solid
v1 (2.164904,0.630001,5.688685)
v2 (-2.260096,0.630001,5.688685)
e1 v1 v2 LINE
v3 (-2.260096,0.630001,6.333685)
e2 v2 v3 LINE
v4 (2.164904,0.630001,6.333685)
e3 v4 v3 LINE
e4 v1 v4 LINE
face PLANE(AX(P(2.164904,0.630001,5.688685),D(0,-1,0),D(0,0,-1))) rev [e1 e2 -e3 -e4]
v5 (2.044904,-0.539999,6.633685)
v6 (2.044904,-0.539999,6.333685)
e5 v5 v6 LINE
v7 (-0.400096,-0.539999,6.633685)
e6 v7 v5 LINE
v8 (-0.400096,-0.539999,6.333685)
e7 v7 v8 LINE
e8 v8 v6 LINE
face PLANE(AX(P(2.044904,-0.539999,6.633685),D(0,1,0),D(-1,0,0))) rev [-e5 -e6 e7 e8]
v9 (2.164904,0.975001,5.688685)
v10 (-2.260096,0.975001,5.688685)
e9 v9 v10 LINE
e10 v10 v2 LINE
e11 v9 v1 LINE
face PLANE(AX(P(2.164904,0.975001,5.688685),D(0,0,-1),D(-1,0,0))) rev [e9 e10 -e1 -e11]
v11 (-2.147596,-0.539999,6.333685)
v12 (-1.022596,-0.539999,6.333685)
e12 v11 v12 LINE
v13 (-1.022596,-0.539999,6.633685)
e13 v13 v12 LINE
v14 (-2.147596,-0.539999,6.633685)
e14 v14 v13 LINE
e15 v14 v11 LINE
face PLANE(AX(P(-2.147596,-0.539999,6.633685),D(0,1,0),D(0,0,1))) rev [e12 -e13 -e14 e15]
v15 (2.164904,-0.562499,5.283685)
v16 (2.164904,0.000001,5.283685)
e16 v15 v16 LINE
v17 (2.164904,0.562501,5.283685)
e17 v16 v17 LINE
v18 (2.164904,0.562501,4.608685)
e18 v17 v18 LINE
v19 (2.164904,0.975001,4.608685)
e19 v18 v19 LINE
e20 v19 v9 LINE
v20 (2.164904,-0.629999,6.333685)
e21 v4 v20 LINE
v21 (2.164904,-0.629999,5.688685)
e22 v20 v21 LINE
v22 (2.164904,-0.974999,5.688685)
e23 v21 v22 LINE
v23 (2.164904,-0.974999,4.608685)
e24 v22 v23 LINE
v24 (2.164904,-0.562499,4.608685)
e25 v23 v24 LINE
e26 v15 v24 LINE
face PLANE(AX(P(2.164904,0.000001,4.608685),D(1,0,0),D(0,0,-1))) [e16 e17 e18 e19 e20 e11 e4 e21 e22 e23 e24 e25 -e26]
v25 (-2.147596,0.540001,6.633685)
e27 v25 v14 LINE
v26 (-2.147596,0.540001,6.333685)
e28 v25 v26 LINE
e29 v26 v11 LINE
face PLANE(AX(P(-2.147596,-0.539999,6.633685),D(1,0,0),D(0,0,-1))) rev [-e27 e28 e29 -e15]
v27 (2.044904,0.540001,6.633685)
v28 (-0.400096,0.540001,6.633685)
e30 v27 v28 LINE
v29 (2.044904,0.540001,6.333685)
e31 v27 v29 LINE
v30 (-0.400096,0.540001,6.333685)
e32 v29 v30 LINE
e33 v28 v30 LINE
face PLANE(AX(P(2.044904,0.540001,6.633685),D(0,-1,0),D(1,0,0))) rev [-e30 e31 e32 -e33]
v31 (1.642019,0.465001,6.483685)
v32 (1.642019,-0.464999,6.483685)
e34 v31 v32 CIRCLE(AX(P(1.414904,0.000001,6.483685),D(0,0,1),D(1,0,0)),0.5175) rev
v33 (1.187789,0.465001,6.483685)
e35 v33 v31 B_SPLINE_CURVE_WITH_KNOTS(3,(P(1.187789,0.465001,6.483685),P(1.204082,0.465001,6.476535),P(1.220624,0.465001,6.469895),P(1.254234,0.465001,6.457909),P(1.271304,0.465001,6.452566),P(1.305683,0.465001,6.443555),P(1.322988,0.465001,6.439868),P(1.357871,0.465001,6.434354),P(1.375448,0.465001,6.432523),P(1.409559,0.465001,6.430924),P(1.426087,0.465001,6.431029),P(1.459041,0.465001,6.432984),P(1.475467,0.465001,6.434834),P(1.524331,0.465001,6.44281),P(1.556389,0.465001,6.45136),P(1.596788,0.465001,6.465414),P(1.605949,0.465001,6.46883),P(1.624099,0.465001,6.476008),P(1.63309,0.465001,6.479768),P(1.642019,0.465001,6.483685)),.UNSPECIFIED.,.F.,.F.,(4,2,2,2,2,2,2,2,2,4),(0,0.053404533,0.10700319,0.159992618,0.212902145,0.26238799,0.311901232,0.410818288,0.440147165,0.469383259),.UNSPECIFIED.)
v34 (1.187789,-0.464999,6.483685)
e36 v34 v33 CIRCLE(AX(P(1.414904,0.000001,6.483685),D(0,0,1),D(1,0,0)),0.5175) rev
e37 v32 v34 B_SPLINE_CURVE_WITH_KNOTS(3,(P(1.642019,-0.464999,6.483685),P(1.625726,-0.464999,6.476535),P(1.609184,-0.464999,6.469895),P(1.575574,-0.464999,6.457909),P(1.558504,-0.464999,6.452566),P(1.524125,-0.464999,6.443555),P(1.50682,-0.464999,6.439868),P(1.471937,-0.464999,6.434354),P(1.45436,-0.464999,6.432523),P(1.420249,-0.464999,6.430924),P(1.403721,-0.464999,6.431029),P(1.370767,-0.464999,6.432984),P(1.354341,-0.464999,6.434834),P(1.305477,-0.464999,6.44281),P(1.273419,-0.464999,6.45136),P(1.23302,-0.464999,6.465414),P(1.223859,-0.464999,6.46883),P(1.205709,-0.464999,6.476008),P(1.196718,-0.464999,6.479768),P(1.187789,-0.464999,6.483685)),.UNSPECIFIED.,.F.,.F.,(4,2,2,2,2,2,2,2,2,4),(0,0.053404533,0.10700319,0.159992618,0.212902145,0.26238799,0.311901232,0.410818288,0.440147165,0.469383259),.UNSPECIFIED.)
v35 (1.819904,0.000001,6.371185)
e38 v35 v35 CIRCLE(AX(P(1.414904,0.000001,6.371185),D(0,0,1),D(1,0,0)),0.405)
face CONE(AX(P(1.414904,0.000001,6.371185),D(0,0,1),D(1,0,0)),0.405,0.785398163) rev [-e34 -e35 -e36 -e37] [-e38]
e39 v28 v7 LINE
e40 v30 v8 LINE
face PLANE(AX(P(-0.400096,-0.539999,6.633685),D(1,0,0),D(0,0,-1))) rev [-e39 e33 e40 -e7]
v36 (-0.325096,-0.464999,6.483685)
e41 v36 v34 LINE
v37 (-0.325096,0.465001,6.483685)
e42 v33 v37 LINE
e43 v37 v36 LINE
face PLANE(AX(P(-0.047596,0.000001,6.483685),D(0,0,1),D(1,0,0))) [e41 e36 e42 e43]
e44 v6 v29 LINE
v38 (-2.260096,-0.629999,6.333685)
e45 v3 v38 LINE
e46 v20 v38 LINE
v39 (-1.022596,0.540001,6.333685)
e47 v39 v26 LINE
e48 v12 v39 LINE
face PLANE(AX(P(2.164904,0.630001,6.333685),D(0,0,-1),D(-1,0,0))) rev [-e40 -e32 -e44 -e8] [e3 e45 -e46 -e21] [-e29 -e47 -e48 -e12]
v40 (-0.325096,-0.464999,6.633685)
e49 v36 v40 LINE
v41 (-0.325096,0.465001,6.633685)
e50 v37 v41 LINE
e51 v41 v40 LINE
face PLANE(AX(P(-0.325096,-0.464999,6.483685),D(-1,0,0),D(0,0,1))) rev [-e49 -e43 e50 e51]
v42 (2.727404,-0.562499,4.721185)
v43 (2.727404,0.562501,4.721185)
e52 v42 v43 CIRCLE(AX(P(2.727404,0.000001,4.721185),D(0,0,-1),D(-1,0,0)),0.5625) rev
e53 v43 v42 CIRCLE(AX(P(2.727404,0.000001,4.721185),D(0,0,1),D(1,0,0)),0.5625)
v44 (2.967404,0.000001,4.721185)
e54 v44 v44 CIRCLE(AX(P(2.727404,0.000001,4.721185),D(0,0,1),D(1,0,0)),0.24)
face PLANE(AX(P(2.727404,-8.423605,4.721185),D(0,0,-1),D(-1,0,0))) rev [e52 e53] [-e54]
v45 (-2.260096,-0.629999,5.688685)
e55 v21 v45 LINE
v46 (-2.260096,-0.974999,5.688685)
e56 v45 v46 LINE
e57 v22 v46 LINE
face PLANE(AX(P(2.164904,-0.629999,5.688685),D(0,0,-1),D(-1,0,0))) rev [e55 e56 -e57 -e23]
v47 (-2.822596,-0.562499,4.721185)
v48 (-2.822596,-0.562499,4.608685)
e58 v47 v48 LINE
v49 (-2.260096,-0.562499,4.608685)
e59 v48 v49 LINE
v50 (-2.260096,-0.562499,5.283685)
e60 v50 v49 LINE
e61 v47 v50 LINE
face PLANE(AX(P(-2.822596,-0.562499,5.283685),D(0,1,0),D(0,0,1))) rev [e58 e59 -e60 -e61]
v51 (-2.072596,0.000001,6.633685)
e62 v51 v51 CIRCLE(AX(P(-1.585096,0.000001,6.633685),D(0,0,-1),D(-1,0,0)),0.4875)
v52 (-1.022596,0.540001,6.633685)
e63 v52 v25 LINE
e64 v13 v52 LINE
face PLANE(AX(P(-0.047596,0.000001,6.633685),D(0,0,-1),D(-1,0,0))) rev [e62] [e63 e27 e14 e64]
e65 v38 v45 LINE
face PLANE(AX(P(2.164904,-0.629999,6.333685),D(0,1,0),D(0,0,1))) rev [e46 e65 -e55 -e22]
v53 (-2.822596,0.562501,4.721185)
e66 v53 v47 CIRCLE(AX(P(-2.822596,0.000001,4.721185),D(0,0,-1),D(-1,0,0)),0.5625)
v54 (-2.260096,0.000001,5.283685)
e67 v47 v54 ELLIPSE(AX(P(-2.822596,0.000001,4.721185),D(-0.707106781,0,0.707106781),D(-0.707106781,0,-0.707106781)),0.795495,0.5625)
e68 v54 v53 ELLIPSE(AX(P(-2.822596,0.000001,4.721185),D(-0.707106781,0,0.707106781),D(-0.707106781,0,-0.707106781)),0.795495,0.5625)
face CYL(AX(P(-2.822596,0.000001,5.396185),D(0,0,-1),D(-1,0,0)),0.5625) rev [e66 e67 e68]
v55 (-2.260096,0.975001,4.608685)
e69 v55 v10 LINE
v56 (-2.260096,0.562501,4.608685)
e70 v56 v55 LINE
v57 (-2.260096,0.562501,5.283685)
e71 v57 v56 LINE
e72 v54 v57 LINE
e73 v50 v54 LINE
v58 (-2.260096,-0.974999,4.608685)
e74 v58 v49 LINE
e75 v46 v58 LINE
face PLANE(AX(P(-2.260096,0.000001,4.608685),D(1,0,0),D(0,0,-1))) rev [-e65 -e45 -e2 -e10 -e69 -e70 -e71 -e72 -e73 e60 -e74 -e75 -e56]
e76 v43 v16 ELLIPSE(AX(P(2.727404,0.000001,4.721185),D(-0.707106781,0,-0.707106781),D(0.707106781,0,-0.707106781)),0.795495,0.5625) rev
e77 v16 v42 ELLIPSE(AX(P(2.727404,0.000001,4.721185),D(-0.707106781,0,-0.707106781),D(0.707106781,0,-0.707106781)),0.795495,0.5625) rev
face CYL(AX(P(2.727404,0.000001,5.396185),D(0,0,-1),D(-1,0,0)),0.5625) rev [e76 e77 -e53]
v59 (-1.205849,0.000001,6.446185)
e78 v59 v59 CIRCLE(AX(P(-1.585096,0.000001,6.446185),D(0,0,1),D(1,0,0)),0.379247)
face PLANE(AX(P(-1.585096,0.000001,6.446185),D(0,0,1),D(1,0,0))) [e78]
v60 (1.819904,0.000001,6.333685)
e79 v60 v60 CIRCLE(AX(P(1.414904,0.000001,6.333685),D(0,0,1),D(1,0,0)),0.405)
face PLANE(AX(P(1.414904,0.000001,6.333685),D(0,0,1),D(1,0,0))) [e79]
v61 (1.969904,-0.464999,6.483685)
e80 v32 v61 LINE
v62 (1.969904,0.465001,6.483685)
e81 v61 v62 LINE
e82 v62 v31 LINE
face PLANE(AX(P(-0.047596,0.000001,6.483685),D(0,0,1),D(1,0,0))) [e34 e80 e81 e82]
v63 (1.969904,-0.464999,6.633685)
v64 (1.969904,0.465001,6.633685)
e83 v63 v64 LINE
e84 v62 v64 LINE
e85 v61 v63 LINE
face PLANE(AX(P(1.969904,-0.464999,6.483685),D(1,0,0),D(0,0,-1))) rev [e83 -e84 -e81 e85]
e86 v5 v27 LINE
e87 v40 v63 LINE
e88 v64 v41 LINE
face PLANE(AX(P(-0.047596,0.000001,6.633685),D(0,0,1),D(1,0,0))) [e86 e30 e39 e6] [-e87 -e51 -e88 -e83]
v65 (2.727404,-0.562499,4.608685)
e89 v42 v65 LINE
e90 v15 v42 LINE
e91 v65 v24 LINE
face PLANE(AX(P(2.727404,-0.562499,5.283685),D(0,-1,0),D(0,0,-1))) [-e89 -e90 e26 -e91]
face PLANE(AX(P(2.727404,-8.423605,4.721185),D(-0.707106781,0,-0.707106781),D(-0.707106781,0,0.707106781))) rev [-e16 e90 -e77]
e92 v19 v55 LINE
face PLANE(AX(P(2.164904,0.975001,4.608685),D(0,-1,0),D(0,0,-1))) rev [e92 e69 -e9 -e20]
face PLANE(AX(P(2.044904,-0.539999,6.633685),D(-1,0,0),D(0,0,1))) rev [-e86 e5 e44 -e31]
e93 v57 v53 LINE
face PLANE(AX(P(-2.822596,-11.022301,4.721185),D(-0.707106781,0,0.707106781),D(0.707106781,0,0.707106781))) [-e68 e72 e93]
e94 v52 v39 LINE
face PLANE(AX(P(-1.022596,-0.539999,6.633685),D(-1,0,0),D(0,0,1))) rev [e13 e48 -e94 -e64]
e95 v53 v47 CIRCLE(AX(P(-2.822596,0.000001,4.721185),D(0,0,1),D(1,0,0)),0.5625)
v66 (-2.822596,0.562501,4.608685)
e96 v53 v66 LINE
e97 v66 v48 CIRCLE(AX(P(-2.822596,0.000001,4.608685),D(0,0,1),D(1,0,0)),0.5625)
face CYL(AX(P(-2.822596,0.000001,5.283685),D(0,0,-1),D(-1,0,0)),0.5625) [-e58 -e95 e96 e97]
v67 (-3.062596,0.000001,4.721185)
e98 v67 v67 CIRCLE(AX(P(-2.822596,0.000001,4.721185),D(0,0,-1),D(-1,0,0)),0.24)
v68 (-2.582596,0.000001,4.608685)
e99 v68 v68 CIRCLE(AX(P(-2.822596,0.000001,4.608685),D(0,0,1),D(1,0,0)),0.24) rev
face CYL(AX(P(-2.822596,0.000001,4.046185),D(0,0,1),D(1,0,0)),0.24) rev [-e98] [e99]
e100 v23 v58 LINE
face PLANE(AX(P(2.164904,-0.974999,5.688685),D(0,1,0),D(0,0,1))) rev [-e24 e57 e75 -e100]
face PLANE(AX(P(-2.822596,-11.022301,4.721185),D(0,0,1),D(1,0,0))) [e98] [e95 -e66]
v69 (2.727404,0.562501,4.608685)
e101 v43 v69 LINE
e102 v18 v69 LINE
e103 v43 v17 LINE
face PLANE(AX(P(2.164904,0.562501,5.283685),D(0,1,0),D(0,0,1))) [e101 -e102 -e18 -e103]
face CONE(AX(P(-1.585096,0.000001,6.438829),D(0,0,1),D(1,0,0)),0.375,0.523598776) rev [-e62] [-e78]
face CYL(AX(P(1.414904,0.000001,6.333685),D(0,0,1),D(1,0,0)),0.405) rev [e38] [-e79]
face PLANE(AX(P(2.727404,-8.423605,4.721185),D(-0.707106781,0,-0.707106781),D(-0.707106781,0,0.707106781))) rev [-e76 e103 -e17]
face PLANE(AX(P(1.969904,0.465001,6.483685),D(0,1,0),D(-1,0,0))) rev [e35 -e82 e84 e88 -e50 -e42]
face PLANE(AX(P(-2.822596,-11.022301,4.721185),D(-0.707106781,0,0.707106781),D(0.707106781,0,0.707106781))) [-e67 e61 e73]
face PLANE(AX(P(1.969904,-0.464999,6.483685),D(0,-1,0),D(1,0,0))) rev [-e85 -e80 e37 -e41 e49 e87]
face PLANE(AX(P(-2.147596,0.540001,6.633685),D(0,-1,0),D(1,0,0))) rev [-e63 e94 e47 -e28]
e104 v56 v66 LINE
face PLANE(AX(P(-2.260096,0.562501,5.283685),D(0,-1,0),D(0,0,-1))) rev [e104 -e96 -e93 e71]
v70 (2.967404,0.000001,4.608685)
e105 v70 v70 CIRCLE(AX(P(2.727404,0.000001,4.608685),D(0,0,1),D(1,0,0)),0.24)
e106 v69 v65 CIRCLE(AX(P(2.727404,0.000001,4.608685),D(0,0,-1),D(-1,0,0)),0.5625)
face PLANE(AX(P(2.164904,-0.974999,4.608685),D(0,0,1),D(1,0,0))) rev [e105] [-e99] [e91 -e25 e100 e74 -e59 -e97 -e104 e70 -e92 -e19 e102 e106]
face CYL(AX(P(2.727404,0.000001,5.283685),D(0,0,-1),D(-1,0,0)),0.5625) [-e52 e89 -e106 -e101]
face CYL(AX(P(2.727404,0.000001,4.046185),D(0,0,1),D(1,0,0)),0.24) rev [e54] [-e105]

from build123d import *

# Parameters (mm, degrees)
BOSS_EXTRUDE5_DEPTH = 14.75
SKETCH9_W           = 7.5
SKETCH9_H           = 7.2
SKETCH9_W_2         = 16.3
BOSS_EXTRUDE6_DEPTH = 2
SKETCH10_W          = 15.3
SKETCH10_H          = 6.2
CUT_EXTRUDE4_DEPTH  = 1
SKETCH11_R          = 2.5
CUT_EXTRUDE5_DEPTH  = 1.25
BOSS_EXTRUDE7_DEPTH = 4.5
CUT_EXTRUDE7_START  = -7.5
CUT_EXTRUDE7_DEPTH  = 7.5
SKETCH18_R          = 3.75
CUT_EXTRUDE8_DEPTH  = 4.5
SKETCH19_R          = 1.6
CUT_EXTRUDE9_DEPTH  = 4.5
CHAMFER1_SIZE       = 0.75
CHAMFER1_SIZE_2     = 1.299038106
SKETCH13_R          = 2.7
CUT_EXTRUDE6_DEPTH  = 1
CHAMFER2_SIZE       = 0.75
SCALE1_SCALE        = 0.15


# Read off the part's stored shape, not the designer's step: Cut-Extrude7
with BuildPart() as part:
    # Sketch8 → Boss-Extrude5 (new, symmetric)
    with BuildSketch(Plane(origin=(0, 0, 0), x_dir=(0, 0, -1), z_dir=(1, 0, 0))):
        Polygon((0, -6.5), (0, 6.5), (-7.2, 6.5), (-7.2, 4.2), (-11.5, 4.2), (-11.5, -4.2), (-7.2, -4.2), (-7.2, -6.5), align=None)
    extrude(amount=BOSS_EXTRUDE5_DEPTH, both=True)

    # Sketch9 → Boss-Extrude6 (add)
    with BuildSketch(Plane.XY.offset(11.5)):
        with Locations((-10.25, 0)):
            Rectangle(SKETCH9_W, SKETCH9_H)
        with Locations((5.8, 0)):
            Rectangle(SKETCH9_W_2, SKETCH9_H)
    extrude(amount=BOSS_EXTRUDE6_DEPTH)

    # Sketch10 → Cut-Extrude4 (cut)
    with BuildSketch(Plane.XY.offset(13.5)):
        with Locations((5.8, 0)):
            Rectangle(SKETCH10_W, SKETCH10_H)
    extrude(amount=-CUT_EXTRUDE4_DEPTH, mode=Mode.SUBTRACT)

    # Sketch11 → Cut-Extrude5 (cut)
    with BuildSketch(Plane.XY.offset(13.5)):
        with Locations((-10.25, 0)):
            Circle(SKETCH11_R)
    extrude(amount=-CUT_EXTRUDE5_DEPTH, mode=Mode.SUBTRACT)

    # Sketch16 → Boss-Extrude7 (add)
    with BuildSketch(Plane(origin=(0, 0, 0), x_dir=(-1, 0, 0), z_dir=(0, 0, -1))):
        with BuildLine():
            Line((-14.75, -3.75), (-14.75, 3.75))
            Line((-14.75, 3.75), (-18.5, 3.75))
            ThreePointArc((-18.5, 3.75), (-22.25, 0), (-18.5, -3.75))
            Line((-18.5, -3.75), (-14.75, -3.75))
        make_face()
    boss_extrude7 = extrude(amount=-BOSS_EXTRUDE7_DEPTH)

    # Cut-Extrude7 outline → Cut-Extrude7 (cut)
    with BuildSketch(Plane.XZ.offset(3.75).offset(CUT_EXTRUDE7_START)):
        Polygon((14.75, 4.5), (18.5, 0.75), (24, 0.75), (24, 4.5), align=None)
    cut_extrude7 = extrude(amount=CUT_EXTRUDE7_DEPTH, mode=Mode.SUBTRACT)

    # Sketch18 → Cut-Extrude8 (cut)
    with BuildSketch(Plane.XY.offset(0.75)):
        with Locations((18.5, 0)):
            Circle(SKETCH18_R)
    cut_extrude8 = extrude(amount=CUT_EXTRUDE8_DEPTH, mode=Mode.SUBTRACT)

    # Sketch19 → Cut-Extrude9 (cut)
    with BuildSketch(Plane.XY.offset(0.75)):
        with Locations((18.5, 0)):
            Circle(SKETCH19_R)
    cut_extrude9 = extrude(amount=-CUT_EXTRUDE9_DEPTH, mode=Mode.SUBTRACT)

    # Mirror1: Boss-Extrude7, Cut-Extrude7, Cut-Extrude8, Cut-Extrude9 across plane
    add(boss_extrude7.mirror(Plane(origin=(0, 0, 0), x_dir=(0, 0, 1), z_dir=(1, 0, 0))))
    add(cut_extrude7.mirror(Plane(origin=(0, 0, 0), x_dir=(0, 0, 1), z_dir=(1, 0, 0))), mode=Mode.SUBTRACT)
    add(cut_extrude8.mirror(Plane(origin=(0, 0, 0), x_dir=(0, 0, 1), z_dir=(1, 0, 0))), mode=Mode.SUBTRACT)
    add(cut_extrude9.mirror(Plane(origin=(0, 0, 0), x_dir=(0, 0, 1), z_dir=(1, 0, 0))), mode=Mode.SUBTRACT)

    # Chamfer1
    # the kernel refuses this chamfer: 1.299038106, 0.75 mm, written as the material it takes off along each edge
    with BuildSketch(Plane(origin=(-10.25, 0, 13.5), x_dir=(1, 0, 0), z_dir=(0, -1, 0))) as chamfer1_piece_1_section:
        Polygon((2.5 + CHAMFER1_SIZE, 0), (2.5, -CHAMFER1_SIZE_2), (2.5, 0), align=None)
    chamfer1_piece_1 = revolve(axis=Axis((-10.25, 0, 13.5), (0, 0, 1)), mode=Mode.PRIVATE)
    chamfer1_piece_1 = split(chamfer1_piece_1, bisect_by=Plane(origin=(-13.133837987, 0, 12.25), z_dir=(0, 0, 1)), keep=Keep.TOP, mode=Mode.PRIVATE)
    add(chamfer1_piece_1, mode=Mode.SUBTRACT)

    # Sketch13 → Cut-Extrude6 (cut)
    with BuildSketch(Plane.XY.offset(12.5)):
        with Locations((9.75, 0)):
            Circle(SKETCH13_R)
    extrude(amount=-CUT_EXTRUDE6_DEPTH, mode=Mode.SUBTRACT)

    # Chamfer2
    # the kernel refuses this chamfer: 0.75 mm, written as the material it takes off along each edge
    with BuildSketch(Plane(origin=(9.75, 0, 12.5), x_dir=(1, 0, 0), z_dir=(0, -1, 0))) as chamfer2_piece_1_section:
        Polygon((2.7 + CHAMFER2_SIZE, 0), (2.7, -CHAMFER2_SIZE), (2.7, 0), align=None)
    chamfer2_piece_1 = revolve(axis=Axis((9.75, 0, 12.5), (0, 0, 1)), mode=Mode.PRIVATE)
    chamfer2_piece_1 = split(chamfer2_piece_1, bisect_by=Plane(origin=(6.68747717, -3.1, 12.13747717), z_dir=(0, 1, 0)), keep=Keep.TOP, mode=Mode.PRIVATE)
    chamfer2_piece_1 = split(chamfer2_piece_1, bisect_by=Plane(origin=(6.68747717, 3.1, 12.13747717), z_dir=(0, -1, 0)), keep=Keep.TOP, mode=Mode.PRIVATE)
    add(chamfer2_piece_1, mode=Mode.SUBTRACT)


with BuildPart() as part_1:
    # Scale1: scaled about (-0.05599767, 0, 5.421987795)
    add(part.part.scale(SCALE1_SCALE).moved(Location((-0.047598019, 0, 4.608689626))))


solid = part_1.part
